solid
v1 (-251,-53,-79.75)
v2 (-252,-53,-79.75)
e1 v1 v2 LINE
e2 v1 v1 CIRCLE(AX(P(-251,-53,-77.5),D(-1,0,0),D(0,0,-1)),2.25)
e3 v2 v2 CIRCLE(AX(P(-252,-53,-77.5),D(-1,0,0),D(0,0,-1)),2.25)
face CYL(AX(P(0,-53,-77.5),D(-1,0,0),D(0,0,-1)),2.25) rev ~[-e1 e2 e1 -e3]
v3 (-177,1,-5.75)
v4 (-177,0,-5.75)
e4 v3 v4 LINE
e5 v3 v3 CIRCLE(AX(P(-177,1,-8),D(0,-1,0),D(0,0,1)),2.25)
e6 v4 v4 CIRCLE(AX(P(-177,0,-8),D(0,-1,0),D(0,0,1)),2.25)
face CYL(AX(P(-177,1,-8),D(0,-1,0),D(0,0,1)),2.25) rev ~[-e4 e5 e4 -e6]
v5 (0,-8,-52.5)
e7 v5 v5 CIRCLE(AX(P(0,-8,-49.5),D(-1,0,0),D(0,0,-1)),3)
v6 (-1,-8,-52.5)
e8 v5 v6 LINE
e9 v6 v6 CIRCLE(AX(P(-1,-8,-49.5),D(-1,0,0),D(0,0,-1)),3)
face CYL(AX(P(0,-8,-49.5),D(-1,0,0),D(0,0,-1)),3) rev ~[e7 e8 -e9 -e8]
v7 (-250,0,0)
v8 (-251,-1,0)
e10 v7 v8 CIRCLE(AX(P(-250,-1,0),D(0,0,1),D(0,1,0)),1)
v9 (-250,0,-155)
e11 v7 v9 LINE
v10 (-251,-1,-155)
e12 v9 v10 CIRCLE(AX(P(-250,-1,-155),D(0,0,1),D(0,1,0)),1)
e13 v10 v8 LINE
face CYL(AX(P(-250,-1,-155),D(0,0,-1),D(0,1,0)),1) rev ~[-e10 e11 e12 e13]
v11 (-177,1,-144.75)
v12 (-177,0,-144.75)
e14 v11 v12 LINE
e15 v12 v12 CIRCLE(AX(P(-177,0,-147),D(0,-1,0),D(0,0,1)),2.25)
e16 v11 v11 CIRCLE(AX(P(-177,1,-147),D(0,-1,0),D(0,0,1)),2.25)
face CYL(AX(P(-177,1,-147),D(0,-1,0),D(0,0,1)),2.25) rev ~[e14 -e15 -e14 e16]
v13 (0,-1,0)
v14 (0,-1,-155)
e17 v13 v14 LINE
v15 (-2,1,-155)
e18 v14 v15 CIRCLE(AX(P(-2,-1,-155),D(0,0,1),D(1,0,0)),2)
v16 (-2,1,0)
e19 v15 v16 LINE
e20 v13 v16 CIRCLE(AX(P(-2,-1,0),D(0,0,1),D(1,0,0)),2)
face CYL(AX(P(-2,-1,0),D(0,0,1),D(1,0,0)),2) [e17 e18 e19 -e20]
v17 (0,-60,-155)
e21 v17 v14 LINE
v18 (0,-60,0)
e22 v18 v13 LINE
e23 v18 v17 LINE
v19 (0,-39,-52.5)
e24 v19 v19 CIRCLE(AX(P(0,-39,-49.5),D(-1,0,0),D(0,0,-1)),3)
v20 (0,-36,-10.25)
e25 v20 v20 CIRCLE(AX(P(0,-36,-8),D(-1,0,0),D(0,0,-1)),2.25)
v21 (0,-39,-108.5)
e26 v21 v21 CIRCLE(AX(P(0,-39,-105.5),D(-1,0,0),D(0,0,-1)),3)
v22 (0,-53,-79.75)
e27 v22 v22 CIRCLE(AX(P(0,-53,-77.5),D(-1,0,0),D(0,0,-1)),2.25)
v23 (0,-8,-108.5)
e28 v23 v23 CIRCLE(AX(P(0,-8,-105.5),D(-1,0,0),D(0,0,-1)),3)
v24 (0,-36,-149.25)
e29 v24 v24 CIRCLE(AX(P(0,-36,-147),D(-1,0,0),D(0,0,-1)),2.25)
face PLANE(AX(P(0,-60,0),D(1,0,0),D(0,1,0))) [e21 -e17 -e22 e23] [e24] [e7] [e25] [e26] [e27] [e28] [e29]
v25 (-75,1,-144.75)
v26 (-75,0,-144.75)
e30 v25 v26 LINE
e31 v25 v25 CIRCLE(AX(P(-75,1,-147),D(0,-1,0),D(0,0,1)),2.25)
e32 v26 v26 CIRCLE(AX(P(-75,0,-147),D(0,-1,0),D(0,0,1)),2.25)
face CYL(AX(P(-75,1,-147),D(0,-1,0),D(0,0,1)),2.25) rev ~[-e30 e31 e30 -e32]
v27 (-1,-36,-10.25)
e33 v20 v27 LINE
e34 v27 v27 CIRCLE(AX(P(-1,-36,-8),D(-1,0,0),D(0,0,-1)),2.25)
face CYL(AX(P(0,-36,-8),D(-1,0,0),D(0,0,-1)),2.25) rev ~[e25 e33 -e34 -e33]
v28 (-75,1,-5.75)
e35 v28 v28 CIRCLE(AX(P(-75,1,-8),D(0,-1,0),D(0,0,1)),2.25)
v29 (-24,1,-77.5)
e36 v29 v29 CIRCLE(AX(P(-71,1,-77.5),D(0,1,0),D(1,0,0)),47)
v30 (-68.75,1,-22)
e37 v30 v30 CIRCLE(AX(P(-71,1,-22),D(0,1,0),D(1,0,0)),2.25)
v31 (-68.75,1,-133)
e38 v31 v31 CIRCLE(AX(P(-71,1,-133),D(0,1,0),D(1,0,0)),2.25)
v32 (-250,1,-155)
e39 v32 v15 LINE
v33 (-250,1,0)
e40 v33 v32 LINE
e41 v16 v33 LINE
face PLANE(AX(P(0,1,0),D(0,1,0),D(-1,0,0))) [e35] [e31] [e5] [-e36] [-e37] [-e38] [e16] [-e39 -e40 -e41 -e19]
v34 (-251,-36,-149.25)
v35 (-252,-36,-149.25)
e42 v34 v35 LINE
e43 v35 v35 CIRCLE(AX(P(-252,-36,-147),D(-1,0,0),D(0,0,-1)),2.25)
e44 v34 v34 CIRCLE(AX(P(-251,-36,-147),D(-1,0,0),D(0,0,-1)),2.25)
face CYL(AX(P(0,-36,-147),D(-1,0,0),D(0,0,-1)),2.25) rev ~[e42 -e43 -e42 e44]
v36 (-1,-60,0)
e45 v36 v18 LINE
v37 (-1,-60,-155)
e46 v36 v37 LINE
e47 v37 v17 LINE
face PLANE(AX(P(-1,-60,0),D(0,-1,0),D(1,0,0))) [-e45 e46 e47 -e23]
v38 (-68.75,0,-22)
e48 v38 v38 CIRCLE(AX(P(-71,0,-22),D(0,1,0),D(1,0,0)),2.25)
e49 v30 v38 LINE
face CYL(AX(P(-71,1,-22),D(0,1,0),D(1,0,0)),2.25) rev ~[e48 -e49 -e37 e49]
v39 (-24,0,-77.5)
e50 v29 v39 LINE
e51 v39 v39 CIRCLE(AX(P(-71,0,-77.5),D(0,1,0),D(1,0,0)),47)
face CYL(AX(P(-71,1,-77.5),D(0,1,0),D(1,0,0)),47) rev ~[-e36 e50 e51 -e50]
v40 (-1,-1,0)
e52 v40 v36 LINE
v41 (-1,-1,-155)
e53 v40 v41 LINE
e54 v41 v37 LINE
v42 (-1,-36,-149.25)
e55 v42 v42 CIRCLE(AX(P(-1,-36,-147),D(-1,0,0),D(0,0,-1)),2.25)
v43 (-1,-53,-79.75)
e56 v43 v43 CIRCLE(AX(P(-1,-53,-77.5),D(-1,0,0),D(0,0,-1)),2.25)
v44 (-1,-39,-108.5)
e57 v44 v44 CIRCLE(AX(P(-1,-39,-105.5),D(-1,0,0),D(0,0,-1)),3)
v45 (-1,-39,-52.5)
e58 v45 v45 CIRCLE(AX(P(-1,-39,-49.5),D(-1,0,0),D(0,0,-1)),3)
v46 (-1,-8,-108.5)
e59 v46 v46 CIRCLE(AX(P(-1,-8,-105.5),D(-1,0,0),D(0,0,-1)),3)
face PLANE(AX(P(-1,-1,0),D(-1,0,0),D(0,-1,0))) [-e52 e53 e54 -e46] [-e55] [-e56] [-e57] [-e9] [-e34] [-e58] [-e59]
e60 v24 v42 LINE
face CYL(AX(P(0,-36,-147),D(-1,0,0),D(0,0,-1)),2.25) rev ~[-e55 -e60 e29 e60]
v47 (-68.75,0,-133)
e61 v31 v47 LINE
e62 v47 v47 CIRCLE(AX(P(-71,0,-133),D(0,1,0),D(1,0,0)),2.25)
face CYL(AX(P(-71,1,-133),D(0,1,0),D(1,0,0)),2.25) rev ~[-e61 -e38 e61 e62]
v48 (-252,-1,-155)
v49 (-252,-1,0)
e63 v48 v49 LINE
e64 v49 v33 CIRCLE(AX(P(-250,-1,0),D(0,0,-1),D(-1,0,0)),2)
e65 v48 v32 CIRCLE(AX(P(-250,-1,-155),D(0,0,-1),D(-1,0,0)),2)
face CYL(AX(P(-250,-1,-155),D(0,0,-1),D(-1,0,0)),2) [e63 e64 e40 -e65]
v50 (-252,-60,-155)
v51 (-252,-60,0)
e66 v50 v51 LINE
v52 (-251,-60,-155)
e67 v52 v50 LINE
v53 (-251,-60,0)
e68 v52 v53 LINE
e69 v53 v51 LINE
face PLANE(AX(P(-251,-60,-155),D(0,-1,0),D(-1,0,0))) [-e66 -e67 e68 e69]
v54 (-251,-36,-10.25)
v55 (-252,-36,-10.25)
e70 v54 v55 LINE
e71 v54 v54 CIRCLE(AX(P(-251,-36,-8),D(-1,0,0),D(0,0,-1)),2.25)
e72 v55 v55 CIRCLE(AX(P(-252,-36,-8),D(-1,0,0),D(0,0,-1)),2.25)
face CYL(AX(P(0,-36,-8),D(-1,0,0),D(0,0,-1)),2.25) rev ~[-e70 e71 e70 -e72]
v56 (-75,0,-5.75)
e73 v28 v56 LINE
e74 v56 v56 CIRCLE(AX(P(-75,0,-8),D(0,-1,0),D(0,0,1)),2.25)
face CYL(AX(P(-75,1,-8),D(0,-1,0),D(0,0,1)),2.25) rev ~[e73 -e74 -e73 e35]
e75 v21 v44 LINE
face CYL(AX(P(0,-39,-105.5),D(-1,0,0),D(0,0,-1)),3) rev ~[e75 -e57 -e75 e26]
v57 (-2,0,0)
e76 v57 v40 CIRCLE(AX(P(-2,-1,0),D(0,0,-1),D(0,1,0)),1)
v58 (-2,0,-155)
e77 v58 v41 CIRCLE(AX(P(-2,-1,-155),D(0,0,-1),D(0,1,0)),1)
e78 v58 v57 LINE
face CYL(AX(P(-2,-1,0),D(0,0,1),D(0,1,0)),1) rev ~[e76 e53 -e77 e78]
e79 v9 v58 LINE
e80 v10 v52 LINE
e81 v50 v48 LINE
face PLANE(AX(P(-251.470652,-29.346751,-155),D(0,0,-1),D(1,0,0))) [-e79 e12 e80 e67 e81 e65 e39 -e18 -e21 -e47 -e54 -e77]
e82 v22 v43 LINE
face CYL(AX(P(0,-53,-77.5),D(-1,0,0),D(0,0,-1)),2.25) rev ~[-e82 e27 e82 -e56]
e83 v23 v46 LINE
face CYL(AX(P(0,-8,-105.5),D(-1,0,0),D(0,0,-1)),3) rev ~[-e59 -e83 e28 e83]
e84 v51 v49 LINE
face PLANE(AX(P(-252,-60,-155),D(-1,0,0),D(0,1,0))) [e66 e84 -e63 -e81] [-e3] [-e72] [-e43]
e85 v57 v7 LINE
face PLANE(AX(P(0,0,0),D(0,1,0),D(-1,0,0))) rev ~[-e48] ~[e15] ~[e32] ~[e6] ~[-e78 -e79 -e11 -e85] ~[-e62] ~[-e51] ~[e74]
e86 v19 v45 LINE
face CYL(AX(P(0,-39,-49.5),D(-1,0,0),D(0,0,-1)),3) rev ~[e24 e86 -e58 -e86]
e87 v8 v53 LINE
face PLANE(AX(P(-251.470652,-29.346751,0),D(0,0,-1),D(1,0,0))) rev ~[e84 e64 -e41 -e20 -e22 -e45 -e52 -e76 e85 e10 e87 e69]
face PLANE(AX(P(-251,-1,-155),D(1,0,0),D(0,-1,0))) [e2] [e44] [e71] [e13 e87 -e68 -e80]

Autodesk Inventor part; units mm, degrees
ref_plane "YZ Plane" through (0, 0, 0) normal (1, 0, 0) x (0, 1, 0)
ref_plane "XZ Plane" through (0, 0, 0) normal (0, 1, 0) x (-1, 0, 0)
ref_plane "XY Plane" through (0, 0, 0) normal (0, 0, 1) x (1, 0, 0)
sketch "Sketch1" plane through (0, 0, 0) normal (0, 1, 0) x (-1, 0, 0)
  line L0 (0, 0) -> (252, 0)
  line L1 (252, 0) -> (252, -155)
  line L2 (252, -155) -> (0, -155)
  line L3 (0, -155) -> (0, 0)
  dimension "d0" = 252
  dimension "d1" = 155
extrude "Plate1" add sketch "Sketch1" along normal blind 1
sketch "Sketch2" plane through (-1, 1, 0) normal (1, 0, 0) x (0, 1, 0)
  line L0 (0, -155) -> (0, 0)
  line L1 (0, 0) -> (-61, 0)
  line L2 (-61, 0) -> (-61, -155)
  line L3 (-61, -155) -> (0, -155)
edge flange "Flange1" height 61 angle 90 thickness 1 bend radius 1 thickness toward (1, 0, 0) relief tear relief width 1 relief depth 0.5 edges at (0, 0, -77.5) wall of the first edge with corners at (-1, 1, -155) (-1, 1, 0) (-1, -60, 0) (-1, -60, -155)
bend "Bend1"
corner "Corner1"
sketch "Sketch3" plane through (-251, 1, -155) normal (-1, 0, 0) x (0, -1, 0)
  line L0 (0, 155) -> (0, 0)
  line L1 (0, 0) -> (61, 0)
  line L2 (61, 0) -> (61, 155)
  line L3 (61, 155) -> (0, 155)
edge flange "Flange2" height 61 angle 90 thickness 1 bend radius 1 thickness toward (-1, 0, 0) relief tear relief width 1 relief depth 0.5 edges at (-252, 0, -77.5) wall of the first edge with corners at (-251, 1, 0) (-251, 1, -155) (-251, -60, -155) (-251, -60, 0)
bend "Bend2"
corner "Corner2"
sketch "Sketch4" plane through (0, 1, 0) normal (0, 1, 0) x (1, 0, 0)
  line L0 (0, 155) -> (0, 0) projected
  line L1 (0, 0) -> (0, 77.5)
  line L2 (0, 77.5) -> (-71, 77.5)
  circle A0 centre (-71, 77.5) radius 47
  line L3 (-71, 77.5) -> (-71, 133) construction
  line L4 (-71, 77.5) -> (-71, 22) construction
  circle A1 centre (-71, 133) radius 2.25
  circle A2 centre (-71, 22) radius 2.25
  dimension "d23" = 77.5
  dimension "d24" = 71
  dimension "d25" = 94
  dimension "d26" = 55.5
  dimension "d27" = 55.5
  dimension "d28" = 4.5
  dimension "d29" = 4.5
extrude "Extrusion1" cut sketch "Sketch4" against normal through all
sketch "Sketch5" plane through (0, 1, 0) normal (0, 1, 0) x (1, 0, 0)
  line L0 (-252, 0) -> (-252, 155) projected
  line L1 (0, 155) -> (0, 0) projected
  line L2 (-250, 155) -> (-2, 155) projected
  line L3 (-2, 0) -> (-250, 0) projected
  point P0 (-177, 147)
  point P1 (-75, 147)
  point P2 (-177, 8)
  point P3 (-75, 8)
  dimension "d32" = 75
  dimension "d33" = 75
  dimension "d34" = 8
  dimension "d35" = 8
hole "Hole1" at (-177, 1, -147) at (-75, 1, -147) at (-177, 1, -8) at (-75, 1, -8) direction (0, -1, 0) diameter 4.5 end through all
sketch "Sketch6" plane through (0, -60, 0) normal (1, 0, 0) x (0, 0, -1)
  line L0 (0, 0) -> (0, 59) projected
  line L1 (155, 0) -> (0, 0) projected
  line L2 (155, 59) -> (155, 0) projected
  point P0 (0, 60)
  point P1 (8, 24)
  point P2 (77.5, 7)
  point P3 (147, 24)
  dimension "d43" = 77.5
  dimension "d44" = 7
  dimension "d45" = 8
  dimension "d46" = 8
  dimension "d47" = 24
  dimension "d48" = 24
hole "Hole2" at (0, -36, -8) at (0, -53, -77.5) at (0, -36, -147) direction (-1, 0, 0) diameter 4.5 end through all
sketch "Sketch7" plane through (0, -60, 0) normal (1, 0, 0) x (0, 0, -1)
  line L0 (155, 60) -> (0, 60) projected
  line L1 (0, 59) -> (155, 59) projected
  line L2 (77.5, 59) -> (42.5, 59)
  line L3 (42.5, 59) -> (42.5, 14)
  line L4 (42.5, 14) -> (112.5, 14)
  line L5 (112.5, 14) -> (112.5, 59)
  point P0 (49.5, 52)
  point P1 (49.5, 21)
  point P2 (105.5, 21)
  point P3 (105.5, 52)
  dimension "d57" = 35
  dimension "d58" = 45
  dimension "d59" = 70
  dimension "d60" = 7
  dimension "d61" = 7
  dimension "d62" = 7
  dimension "d63" = 7
hole "Hole3" at (0, -8, -49.5) at (0, -39, -49.5) at (0, -39, -105.5) at (0, -8, -105.5) direction (-1, 0, 0) diameter 6 depth 1
equation "\"d33\" = d32"
equation "\"d34\" = d35"
equation "\"d41\" = Thickness"
equation "\"d46\" = d45"
equation "\"d48\" = d47"
equation "\"d54\" = Thickness"
equation "\"d61\" = d60"
equation "\"d63\" = d62"
equation "\"d69\" = Thickness"
equation "\"d2\" = Thickness"
equation "\"d3\" = BendReliefWidth"
equation "\"d4\" = BendReliefDepth"
equation "\"d5\" = MinimumRemnant"
equation "\"d6\" = TransitionRadius"
equation "\"d9\" = BendRadius"
equation "\"d10\" = CornerReliefSize"
equation "\"d11\" = GapSize"
equation "\"d12\" = JacobiRadiusSize"
equation "\"d13\" = BendReliefWidth"
equation "\"d14\" = BendReliefDepth"
equation "\"d15\" = MinimumRemnant"
equation "\"d16\" = TransitionRadius"
equation "\"d19\" = BendRadius"
equation "\"d20\" = CornerReliefSize"
equation "\"d21\" = GapSize"
equation "\"d22\" = JacobiRadiusSize"
equation "\"BendRadius\" = Thickness"
equation "\"BendReliefWidth\" = Thickness"
equation "\"BendReliefDepth\" = 0.5 * Thickness"
equation "\"CornerReliefSize\" = 4 * Thickness"
equation "\"MinimumRemnant\" = 2 * Thickness"
equation "\"TransitionRadius\" = BendRadius"
equation "\"JacobiRadiusSize\" = BendRadius"
equation "\"GapSize\" = Thickness"
equation "\"Thickness\" = 1"
properties part number "Box top_v7" material "Steel, Carbon"
